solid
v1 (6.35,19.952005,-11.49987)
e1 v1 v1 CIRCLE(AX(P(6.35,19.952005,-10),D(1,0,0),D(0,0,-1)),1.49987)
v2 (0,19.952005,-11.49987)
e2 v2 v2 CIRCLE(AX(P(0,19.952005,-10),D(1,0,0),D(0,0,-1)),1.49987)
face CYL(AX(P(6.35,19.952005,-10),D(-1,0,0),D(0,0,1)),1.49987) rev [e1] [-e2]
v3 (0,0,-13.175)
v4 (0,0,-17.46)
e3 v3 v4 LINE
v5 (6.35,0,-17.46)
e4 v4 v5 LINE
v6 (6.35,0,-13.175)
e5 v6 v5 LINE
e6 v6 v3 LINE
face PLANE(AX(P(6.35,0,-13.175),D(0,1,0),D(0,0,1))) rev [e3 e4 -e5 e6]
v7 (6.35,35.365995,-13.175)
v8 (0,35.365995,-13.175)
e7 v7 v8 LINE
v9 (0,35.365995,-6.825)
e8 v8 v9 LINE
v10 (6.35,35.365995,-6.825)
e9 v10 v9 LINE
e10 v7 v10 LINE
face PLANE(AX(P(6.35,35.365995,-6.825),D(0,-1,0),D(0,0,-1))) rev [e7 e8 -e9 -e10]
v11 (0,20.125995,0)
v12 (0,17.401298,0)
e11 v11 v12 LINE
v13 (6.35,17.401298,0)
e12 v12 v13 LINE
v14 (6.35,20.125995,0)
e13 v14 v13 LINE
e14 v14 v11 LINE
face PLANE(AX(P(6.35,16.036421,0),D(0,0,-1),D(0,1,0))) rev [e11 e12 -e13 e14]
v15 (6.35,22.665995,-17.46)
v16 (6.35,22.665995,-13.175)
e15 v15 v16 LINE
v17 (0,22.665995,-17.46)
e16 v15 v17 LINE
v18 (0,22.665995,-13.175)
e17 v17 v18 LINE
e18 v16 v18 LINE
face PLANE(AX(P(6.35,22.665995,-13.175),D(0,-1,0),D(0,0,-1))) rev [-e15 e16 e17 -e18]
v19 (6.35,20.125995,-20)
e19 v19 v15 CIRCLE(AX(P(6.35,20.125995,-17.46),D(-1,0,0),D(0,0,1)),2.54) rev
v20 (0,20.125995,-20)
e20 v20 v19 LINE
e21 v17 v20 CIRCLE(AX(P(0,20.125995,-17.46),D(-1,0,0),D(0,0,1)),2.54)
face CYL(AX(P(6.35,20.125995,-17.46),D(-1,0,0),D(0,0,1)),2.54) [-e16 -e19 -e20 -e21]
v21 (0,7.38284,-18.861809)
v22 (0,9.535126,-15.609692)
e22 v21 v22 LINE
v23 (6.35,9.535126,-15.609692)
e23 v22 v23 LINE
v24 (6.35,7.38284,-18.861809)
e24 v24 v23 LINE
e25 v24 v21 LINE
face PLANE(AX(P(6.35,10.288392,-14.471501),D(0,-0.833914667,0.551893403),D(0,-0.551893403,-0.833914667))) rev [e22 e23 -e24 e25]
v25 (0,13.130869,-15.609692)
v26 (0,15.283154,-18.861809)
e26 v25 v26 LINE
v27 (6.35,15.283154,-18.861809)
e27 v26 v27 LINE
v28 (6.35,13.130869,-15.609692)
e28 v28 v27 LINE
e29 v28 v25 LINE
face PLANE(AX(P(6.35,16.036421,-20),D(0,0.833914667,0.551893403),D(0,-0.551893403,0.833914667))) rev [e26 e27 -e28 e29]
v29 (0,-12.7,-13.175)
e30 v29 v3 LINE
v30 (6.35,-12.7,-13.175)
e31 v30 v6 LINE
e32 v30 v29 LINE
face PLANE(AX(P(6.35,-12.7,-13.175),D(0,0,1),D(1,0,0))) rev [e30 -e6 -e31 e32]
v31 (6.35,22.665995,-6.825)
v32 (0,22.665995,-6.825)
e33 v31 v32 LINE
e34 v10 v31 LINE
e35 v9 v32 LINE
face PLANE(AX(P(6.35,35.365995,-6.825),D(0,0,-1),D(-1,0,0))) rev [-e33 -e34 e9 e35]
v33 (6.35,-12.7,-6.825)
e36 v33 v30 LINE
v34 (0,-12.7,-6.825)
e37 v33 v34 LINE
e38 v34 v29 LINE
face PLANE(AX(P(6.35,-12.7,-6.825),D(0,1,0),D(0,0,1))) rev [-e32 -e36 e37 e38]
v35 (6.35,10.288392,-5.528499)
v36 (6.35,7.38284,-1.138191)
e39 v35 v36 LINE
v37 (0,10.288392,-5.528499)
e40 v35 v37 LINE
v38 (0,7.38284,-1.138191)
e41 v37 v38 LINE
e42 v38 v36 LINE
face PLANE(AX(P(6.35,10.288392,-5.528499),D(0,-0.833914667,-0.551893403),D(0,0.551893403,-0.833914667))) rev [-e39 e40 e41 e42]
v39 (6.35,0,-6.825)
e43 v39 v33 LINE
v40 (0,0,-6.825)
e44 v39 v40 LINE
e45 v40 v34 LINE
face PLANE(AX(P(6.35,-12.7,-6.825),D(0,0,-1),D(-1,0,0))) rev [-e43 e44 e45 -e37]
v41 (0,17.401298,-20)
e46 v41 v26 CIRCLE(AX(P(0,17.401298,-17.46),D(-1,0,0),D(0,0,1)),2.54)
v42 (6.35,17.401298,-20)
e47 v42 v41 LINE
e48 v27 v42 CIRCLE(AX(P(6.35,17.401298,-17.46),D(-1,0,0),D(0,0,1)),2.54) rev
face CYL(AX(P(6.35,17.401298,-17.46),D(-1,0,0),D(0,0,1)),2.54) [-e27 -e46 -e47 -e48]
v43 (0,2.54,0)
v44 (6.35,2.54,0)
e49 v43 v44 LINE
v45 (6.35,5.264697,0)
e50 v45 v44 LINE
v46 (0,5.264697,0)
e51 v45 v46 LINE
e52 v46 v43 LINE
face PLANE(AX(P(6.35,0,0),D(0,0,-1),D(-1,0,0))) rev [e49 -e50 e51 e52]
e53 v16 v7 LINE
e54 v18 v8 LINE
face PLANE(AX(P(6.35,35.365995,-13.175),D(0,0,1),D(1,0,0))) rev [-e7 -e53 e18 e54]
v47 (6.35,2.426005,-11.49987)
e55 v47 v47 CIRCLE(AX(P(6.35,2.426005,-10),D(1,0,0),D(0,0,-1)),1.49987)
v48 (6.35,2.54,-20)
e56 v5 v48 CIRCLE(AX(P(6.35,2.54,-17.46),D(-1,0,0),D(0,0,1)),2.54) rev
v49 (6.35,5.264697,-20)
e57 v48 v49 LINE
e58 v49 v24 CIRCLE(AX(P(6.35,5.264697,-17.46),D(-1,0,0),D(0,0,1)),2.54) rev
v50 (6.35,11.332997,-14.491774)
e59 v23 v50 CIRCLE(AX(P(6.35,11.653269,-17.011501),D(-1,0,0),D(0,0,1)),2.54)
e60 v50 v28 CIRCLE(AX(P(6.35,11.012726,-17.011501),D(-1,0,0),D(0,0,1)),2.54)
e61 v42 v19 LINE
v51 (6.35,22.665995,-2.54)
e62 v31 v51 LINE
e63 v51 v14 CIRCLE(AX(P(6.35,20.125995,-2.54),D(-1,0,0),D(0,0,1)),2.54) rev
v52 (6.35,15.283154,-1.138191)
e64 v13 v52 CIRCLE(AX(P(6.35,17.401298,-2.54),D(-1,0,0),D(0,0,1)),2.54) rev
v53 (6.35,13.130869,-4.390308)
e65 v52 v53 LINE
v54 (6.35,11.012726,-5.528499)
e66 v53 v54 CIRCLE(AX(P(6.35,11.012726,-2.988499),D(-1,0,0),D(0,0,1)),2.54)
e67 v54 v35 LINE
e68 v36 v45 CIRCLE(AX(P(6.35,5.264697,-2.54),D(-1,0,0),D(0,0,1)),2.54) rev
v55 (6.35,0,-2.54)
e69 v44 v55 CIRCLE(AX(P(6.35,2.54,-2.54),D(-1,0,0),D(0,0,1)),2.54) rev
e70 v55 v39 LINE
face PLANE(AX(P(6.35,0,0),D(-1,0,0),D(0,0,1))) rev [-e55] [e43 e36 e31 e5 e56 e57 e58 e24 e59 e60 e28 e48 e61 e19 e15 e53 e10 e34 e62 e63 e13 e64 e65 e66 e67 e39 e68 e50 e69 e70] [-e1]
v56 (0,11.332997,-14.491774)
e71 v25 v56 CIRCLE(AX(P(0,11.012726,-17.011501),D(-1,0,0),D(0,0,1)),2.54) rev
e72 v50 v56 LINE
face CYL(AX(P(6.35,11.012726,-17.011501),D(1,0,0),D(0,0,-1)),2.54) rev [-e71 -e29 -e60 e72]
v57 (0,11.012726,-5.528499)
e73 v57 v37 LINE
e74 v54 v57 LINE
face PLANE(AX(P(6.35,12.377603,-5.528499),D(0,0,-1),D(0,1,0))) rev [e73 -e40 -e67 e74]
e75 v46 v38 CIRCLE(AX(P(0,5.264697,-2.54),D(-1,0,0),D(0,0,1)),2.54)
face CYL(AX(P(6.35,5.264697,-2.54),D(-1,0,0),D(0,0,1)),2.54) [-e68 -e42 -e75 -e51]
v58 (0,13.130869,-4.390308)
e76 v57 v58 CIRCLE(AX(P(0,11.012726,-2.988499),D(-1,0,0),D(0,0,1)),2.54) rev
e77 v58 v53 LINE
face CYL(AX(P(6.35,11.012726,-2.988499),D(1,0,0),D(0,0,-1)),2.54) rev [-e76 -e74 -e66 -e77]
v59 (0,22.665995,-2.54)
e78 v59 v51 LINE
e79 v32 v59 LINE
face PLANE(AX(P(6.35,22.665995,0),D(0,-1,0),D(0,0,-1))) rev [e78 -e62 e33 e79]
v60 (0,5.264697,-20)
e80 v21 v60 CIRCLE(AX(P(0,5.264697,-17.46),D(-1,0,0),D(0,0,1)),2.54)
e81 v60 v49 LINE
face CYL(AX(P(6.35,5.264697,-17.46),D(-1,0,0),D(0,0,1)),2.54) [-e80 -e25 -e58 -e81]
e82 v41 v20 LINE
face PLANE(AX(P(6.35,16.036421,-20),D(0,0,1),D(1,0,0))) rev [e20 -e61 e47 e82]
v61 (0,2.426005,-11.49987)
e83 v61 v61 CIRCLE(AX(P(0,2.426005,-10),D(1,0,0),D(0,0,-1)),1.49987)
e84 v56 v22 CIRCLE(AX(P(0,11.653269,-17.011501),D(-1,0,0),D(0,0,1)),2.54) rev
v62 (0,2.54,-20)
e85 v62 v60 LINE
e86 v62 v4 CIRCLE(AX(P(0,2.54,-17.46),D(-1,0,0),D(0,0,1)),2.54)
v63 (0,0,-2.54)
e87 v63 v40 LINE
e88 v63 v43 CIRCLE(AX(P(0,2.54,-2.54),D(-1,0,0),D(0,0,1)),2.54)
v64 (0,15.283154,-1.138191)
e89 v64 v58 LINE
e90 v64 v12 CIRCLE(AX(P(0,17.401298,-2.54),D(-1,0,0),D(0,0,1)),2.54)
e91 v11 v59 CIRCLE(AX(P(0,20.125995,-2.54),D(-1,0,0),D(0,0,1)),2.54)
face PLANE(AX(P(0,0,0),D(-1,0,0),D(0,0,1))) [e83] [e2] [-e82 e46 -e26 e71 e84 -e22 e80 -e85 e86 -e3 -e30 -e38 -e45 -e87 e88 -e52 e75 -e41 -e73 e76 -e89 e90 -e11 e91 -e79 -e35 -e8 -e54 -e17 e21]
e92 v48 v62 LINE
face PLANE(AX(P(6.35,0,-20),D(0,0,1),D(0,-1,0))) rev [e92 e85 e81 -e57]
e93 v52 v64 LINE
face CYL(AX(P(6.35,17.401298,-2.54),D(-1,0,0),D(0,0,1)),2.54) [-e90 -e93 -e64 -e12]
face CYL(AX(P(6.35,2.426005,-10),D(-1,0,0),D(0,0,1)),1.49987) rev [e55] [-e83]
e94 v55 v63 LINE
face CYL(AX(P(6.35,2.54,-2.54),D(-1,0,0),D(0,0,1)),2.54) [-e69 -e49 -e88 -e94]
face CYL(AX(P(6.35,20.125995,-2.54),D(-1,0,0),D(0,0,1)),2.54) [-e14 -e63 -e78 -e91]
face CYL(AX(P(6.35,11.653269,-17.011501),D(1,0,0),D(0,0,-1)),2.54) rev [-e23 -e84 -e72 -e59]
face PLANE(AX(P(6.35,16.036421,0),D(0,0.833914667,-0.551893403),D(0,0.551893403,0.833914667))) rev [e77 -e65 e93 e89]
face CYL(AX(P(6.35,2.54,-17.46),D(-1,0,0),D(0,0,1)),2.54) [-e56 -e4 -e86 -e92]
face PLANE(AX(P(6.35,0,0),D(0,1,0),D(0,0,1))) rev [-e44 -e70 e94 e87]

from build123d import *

# Parameters (mm, degrees)
SKETCH1_R           = 1.49987
BOSS_EXTRUDE1_DEPTH = 6.35
FILLET1_R           = 2.54


with BuildPart() as part:
    # Sketch1 → Boss-Extrude1 (new body)
    with BuildSketch(Plane(origin=(0, 0, 0), x_dir=(0, 0, -1), z_dir=(1, 0, 0))):
        Polygon((0, 0), (6.825, 0), (6.825, -12.7), (13.175, -12.7), (13.175, 0), (20, 0), (20, 6.629574014), (14.471500996, 10.288392178), (14.471500996, 12.377602622), (20, 16.036420786), (20, 22.6659948), (13.175, 22.6659948), (13.175, 35.3659948), (6.825, 35.3659948), (6.825, 22.6659948), (0, 22.6659948), (0, 16.036420786), (5.528499004, 12.377602622), (5.528499004, 10.288392178), (0, 6.629574014), align=None)
        with Locations((10, 19.9520048)):
            Circle(SKETCH1_R, mode=Mode.SUBTRACT)
        with Locations((10, 2.4260048)):
            Circle(SKETCH1_R, mode=Mode.SUBTRACT)
    extrude(amount=BOSS_EXTRUDE1_DEPTH)

    # Fillet1
    # the kernel refuses this fillet: 2.54 mm, written as the material it adds along each edge
    with BuildSketch(Plane(origin=(0, 12.377602622, -14.471500996), x_dir=(0, -1, 0), z_dir=(1, 0, 0)), Plane(origin=(0, 10.288392178, -14.471500996), x_dir=(0, -0.5518934032294348, -0.8339146667806201), z_dir=(1, 0, 0)), Plane(origin=(0, 12.377602622, -5.528499004), x_dir=(0, 0.5518934032294354, 0.8339146667806197), z_dir=(1, 0, 0))) as fillet1_piece_1:
        with BuildLine():
            CenterArc((FILLET1_R * 0.537353058558, FILLET1_R), FILLET1_R, 213.497005554, 56.502994446)
            Line((-FILLET1_R * 0.296561608223, FILLET1_R * 0.448106596771), (0, 0))
            Line((0, 0), (FILLET1_R * 0.537353058558, 0))
        make_face()
    extrude(amount=6.35)
    # the kernel refuses this fillet: 2.54 mm, written as the material it takes off along each edge
    with BuildSketch(Plane(origin=(-3.412191922, 16.036420786, -20), x_dir=(0, -0.5518934032294348, 0.8339146667806201), z_dir=(1, 0, 0)), Plane(origin=(-3.412191922, 6.629574014, -20), x_dir=(0, -1, 0), z_dir=(1, 0, 0)), Plane(origin=(-3.412191922, 16.036420786, 0), x_dir=(0, 1, 0), z_dir=(1, 0, 0))) as fillet1_2_piece_1:
        with BuildLine():
            CenterArc((FILLET1_R * 0.537353058558, -FILLET1_R), FILLET1_R, 90, 56.502994446)
            Line((-FILLET1_R * 0.296561608223, -FILLET1_R * 0.448106596771), (0, 0))
            Line((0, 0), (FILLET1_R * 0.537353058558, 0))
        make_face()
    extrude(amount=13.174383844, mode=Mode.SUBTRACT)
    with BuildSketch(Plane(origin=(-6.35, 0, -20), x_dir=(0, 0, 1), z_dir=(1, 0, 0)), Plane(origin=(-6.35, 22.6659948, 0), x_dir=(0, 0, -1), z_dir=(1, 0, 0)), Plane(origin=(-6.35, 22.6659948, -20), x_dir=(0, -1, 0), z_dir=(1, 0, 0))) as fillet1_2_piece_2:
        with BuildLine():
            CenterArc((FILLET1_R, -FILLET1_R), FILLET1_R, 90, 90)
            Line((0, -FILLET1_R), (0, 0))
            Line((0, 0), (FILLET1_R, 0))
        make_face()
    extrude(amount=19.05, mode=Mode.SUBTRACT)
    with BuildSketch(Plane(origin=(-6.35, 0, 0), x_dir=(0, 0, -1), z_dir=(1, 0, 0))) as fillet1_2_piece_3:
        with BuildLine():
            CenterArc((FILLET1_R, FILLET1_R), FILLET1_R, 180, 90)
            Line((0, FILLET1_R), (0, 0))
            Line((0, 0), (FILLET1_R, 0))
        make_face()
    extrude(amount=19.05, mode=Mode.SUBTRACT)
    with BuildSketch(Plane(origin=(-3.412191922, 6.629574014, 0), x_dir=(0, -1, 0), z_dir=(1, 0, 0))) as fillet1_2_piece_4:
        with BuildLine():
            CenterArc((FILLET1_R * 0.537353058558, FILLET1_R), FILLET1_R, 213.497005554, 56.502994446)
            Line((-FILLET1_R * 0.296561608223, FILLET1_R * 0.448106596771), (0, 0))
            Line((0, 0), (FILLET1_R * 0.537353058558, 0))
        make_face()
    extrude(amount=13.174383844, mode=Mode.SUBTRACT)


solid = part.part
